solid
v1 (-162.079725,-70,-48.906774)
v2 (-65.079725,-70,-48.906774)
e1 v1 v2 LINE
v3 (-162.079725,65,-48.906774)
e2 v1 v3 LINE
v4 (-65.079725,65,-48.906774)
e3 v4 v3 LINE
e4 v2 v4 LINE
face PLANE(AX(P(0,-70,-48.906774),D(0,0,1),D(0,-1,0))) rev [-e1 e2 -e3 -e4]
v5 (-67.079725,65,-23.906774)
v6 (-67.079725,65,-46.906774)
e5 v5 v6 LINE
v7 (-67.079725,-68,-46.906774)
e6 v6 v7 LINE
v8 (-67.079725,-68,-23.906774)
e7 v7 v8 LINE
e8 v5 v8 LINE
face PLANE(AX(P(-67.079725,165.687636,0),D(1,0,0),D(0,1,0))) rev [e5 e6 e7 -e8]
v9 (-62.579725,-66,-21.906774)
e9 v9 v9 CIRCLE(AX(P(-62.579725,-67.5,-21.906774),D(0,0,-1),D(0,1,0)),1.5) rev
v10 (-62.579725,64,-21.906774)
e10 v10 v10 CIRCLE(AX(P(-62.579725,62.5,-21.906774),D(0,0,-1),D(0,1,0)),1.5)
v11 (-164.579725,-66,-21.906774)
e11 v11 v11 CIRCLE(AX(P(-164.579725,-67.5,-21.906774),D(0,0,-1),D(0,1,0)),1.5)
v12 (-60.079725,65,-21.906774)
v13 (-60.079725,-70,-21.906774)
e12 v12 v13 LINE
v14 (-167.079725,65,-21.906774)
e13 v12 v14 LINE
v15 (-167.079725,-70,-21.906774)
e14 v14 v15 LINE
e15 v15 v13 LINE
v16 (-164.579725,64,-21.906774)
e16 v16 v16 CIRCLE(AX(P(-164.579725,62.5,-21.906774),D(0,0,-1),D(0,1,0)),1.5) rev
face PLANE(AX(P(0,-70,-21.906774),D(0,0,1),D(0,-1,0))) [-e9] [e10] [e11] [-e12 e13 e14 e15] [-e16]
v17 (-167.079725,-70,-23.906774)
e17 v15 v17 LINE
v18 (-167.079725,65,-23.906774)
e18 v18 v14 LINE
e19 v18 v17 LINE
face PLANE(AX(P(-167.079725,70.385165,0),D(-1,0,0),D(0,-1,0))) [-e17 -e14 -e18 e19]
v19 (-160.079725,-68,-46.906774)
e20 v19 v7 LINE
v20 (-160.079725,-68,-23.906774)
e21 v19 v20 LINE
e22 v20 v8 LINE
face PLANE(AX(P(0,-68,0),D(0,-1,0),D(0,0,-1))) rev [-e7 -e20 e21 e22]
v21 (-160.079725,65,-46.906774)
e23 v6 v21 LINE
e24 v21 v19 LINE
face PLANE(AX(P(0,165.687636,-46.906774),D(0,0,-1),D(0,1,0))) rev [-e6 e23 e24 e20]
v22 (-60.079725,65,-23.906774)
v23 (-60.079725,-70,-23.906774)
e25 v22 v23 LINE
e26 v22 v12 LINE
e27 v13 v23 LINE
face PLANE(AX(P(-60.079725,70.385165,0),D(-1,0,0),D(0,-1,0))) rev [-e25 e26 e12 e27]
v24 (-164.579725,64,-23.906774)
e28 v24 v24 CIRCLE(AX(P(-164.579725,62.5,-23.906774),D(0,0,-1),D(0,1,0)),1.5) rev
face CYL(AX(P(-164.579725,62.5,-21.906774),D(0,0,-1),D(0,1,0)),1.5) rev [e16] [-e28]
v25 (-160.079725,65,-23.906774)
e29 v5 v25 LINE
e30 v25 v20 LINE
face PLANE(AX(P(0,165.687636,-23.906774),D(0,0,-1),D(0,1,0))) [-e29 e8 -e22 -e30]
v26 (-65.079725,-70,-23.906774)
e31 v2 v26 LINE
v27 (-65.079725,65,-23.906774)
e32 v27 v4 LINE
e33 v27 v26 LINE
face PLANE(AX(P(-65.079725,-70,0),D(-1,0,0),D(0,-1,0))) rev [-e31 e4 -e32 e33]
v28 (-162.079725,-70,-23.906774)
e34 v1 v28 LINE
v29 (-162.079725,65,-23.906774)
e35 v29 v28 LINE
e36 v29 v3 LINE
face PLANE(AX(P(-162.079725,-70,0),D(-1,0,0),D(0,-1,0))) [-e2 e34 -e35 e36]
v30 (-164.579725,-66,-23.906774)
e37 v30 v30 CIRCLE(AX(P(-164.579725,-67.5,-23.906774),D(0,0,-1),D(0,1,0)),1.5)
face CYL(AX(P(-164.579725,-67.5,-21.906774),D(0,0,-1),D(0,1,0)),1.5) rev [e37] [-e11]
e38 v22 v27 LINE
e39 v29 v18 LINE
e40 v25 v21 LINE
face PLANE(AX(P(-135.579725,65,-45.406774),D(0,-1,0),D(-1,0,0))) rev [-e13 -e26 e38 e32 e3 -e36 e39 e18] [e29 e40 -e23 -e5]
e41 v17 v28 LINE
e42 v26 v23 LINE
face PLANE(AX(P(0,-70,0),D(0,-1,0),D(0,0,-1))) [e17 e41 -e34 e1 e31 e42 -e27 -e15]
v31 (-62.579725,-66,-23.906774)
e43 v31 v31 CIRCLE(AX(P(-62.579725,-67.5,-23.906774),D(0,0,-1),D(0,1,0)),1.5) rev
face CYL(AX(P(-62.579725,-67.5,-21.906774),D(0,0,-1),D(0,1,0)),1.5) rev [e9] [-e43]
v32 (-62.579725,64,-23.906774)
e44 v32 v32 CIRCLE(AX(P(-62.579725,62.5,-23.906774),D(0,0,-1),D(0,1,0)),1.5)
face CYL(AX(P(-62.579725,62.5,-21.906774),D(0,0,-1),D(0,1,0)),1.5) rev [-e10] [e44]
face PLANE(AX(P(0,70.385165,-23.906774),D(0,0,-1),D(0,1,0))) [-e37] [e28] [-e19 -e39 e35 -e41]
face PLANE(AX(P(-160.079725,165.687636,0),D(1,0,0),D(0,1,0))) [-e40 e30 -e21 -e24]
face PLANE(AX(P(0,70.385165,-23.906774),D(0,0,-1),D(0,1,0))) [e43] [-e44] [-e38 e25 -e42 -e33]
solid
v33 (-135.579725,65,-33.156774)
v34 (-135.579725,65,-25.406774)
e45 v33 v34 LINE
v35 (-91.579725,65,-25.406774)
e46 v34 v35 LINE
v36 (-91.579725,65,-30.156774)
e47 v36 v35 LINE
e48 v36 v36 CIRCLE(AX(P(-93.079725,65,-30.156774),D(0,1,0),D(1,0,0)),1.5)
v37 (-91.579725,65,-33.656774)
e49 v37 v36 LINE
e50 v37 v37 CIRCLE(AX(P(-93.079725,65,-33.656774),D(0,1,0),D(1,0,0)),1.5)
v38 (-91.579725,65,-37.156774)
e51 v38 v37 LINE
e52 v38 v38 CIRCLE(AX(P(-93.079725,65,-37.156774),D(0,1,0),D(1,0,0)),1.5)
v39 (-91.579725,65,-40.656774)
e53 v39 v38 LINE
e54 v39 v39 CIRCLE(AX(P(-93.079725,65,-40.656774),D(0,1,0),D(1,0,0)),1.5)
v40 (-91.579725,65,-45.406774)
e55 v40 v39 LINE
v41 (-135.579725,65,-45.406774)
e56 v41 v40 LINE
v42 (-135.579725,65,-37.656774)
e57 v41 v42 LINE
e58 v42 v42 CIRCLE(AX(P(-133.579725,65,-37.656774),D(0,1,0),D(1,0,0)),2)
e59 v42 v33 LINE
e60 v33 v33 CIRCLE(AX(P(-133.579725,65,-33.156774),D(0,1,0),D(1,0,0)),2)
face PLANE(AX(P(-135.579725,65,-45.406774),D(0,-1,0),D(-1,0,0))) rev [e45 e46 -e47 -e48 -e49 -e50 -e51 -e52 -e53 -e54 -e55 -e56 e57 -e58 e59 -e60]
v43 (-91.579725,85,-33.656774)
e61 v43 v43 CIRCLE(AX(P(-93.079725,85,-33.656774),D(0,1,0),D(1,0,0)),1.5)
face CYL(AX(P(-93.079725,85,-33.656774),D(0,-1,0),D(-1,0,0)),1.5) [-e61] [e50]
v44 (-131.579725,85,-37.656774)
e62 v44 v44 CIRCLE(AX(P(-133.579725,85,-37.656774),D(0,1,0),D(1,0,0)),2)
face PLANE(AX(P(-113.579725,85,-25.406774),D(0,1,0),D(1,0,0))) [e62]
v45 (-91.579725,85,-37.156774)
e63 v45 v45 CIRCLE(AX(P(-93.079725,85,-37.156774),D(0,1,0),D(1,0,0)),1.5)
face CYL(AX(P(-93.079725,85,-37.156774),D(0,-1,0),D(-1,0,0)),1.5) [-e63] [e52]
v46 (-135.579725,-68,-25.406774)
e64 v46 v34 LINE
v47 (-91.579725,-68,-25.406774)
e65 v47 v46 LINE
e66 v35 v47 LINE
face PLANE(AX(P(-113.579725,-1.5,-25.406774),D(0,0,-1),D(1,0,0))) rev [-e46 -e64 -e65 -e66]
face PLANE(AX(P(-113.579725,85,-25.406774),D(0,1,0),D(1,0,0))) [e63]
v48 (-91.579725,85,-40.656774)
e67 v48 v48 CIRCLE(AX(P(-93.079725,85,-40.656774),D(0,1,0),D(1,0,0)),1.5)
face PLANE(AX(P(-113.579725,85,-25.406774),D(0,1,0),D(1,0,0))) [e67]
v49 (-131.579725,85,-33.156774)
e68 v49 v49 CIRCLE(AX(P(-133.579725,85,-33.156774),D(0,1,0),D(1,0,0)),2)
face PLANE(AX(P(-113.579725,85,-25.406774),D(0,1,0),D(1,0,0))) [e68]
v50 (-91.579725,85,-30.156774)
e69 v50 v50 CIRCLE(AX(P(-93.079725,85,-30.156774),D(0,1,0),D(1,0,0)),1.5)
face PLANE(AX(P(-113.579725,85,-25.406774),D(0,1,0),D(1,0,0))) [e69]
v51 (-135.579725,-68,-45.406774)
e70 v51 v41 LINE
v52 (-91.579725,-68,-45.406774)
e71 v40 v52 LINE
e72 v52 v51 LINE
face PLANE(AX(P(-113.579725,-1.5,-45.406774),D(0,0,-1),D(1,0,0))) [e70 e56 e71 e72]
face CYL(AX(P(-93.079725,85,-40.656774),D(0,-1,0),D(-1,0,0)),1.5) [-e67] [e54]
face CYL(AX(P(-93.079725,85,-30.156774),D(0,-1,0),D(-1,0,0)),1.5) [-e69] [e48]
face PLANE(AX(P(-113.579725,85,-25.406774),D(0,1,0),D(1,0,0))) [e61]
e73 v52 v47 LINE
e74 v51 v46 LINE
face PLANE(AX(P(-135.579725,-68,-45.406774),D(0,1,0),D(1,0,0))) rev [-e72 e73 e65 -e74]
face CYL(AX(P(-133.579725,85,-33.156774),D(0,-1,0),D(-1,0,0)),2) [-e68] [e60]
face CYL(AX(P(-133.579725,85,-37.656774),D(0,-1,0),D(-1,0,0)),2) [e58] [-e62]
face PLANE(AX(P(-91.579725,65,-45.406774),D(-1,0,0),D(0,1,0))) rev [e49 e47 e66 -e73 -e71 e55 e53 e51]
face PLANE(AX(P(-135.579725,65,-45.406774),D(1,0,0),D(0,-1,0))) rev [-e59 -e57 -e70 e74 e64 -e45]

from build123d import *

# Parameters (mm, degrees)
ZEE3200MAH_START         = -170.079725428
ZEE3200MAH_OUTLINE_W     = 20
ZEE3200MAH_OUTLINE_H     = 44
ZEE3200MAH_DEPTH         = 133
ZEE3200MAH_START_2       = -190.079725428
ZEE3200MAH_2_OUTLINE_R   = 1.5
ZEE3200MAH_2_OUTLINE_R_2 = 2
ZEE3200MAH_2_DEPTH       = 20
BODY_MOVE_COPY1_ANGLE    = 120
SKETCH2_W                = 97
SKETCH2_H                = 27
BOSS_EXTRUDE1_DEPTH      = 2
SKETCH2_3_W              = 2
SKETCH2_3_H              = 2
BOSS_EXTRUDE2_DEPTH      = 133
SKETCH4_W                = 5
SKETCH4_H                = 1
SKETCH4_H_2              = 2
BOSS_EXTRUDE4_DEPTH      = 135
SKETCH7_R                = 1.5
CUT_EXTRUDE2_DEPTH       = 190.118044219


# Read off the part's stored shape, not the designer's step: Zee3200mah
with BuildPart() as part:
    # Zee3200mah outline → Zee3200mah (new body)
    with BuildSketch(Plane.YZ.offset(ZEE3200MAH_START)):
        with Locations((10, -33.906773899)):
            Rectangle(ZEE3200MAH_OUTLINE_W, ZEE3200MAH_OUTLINE_H)
    extrude(amount=ZEE3200MAH_DEPTH)

    # Zee3200mah 2 outline → Zee3200mah 2 (add)
    with BuildSketch(Plane.YZ.offset(ZEE3200MAH_START_2)):
        with Locations((15.25, -13.406773899)):
            Circle(ZEE3200MAH_2_OUTLINE_R)
        with Locations((11.75, -13.406773899)):
            Circle(ZEE3200MAH_2_OUTLINE_R)
        with Locations((8.25, -13.406773899)):
            Circle(ZEE3200MAH_2_OUTLINE_R)
        with Locations((4.75, -13.406773899)):
            Circle(ZEE3200MAH_2_OUTLINE_R)
        with Locations((7.75, -53.906773899)):
            Circle(ZEE3200MAH_2_OUTLINE_R_2)
        with Locations((12.25, -53.906773899)):
            Circle(ZEE3200MAH_2_OUTLINE_R_2)
    extrude(amount=ZEE3200MAH_2_DEPTH)


with BuildPart() as part_1:
    # Body-Move/Copy1: moved
    add(part.part.moved(Location((0, 0, 0))).rotate(Axis((-61.584225652, -43.495499776, 18.088725876), (-0.5773502691896245, 0.5773502691896305, -0.5773502691896225)), BODY_MOVE_COPY1_ANGLE))


with BuildPart() as body_2:
    # Sketch2 → Boss-Extrude1 (new body)
    with BuildSketch(Plane.XZ.offset(68)):
        with Locations((-113.579725428, -35.406773899)):
            Rectangle(SKETCH2_W, SKETCH2_H)
    extrude(amount=BOSS_EXTRUDE1_DEPTH)

    # Sketch2<3> → Boss-Extrude2 (add)
    # profile 1 of 2: a face of its own
    with BuildSketch(Plane.XZ.offset(68)):
        Polygon((-65.079725428, -23.906773899), (-67.079725428, -23.906773899), (-67.079725428, -21.906773899), (-162.079725428, -21.906773899), (-162.079725428, -48.906773899), (-65.079725428, -48.906773899), align=None)
        Polygon((-160.079725428, -23.906773899), (-68.579725428, -23.906773899), (-67.079725428, -23.906773899), (-67.079725428, -25.406773899), (-67.079725428, -46.906773899), (-160.079725428, -46.906773899), align=None, mode=Mode.SUBTRACT)
    # profile 2 of 2: a face of its own
    with BuildSketch(Plane.XZ.offset(68)):
        with Locations((-66.079725428, -22.906773899)):
            Rectangle(SKETCH2_3_W, SKETCH2_3_H)
    extrude(amount=-BOSS_EXTRUDE2_DEPTH)

    # Sketch4 → Boss-Extrude4 (add)
    with BuildSketch(Plane.XZ.offset(70)):
        with Locations((-62.579725428, -23.406773899)):
            Rectangle(SKETCH4_W, SKETCH4_H)
        with Locations((-62.579725428, -22.406773899)):
            Rectangle(SKETCH4_W, SKETCH4_H)
        with Locations((-164.579725428, -22.906773899)):
            Rectangle(SKETCH4_W, SKETCH4_H_2)
    extrude(amount=-BOSS_EXTRUDE4_DEPTH)

    # Sketch7 → Cut-Extrude2 (cut, through all)
    with BuildSketch(Plane(origin=(0, 0, -23.906773899), x_dir=(-1, 0, 0), z_dir=(0, 0, -1))):
        with BuildLine():
            ThreePointArc((64.079725428, 62.5), (63.153750577, 63.885819299), (61.519065257, 63.560660172))
            Line((61.519065257, 63.560660172), (63.6403856, 61.439339828))
            ThreePointArc((63.6403856, 61.439339828), (63.965544727, 61.925974851), (64.079725428, 62.5))
        make_face()
        with BuildLine():
            Line((63.6403856, 61.439339828), (61.519065257, 63.560660172))
            ThreePointArc((61.519065257, 63.560660172), (61.519065257, 61.439339828), (63.6403856, 61.439339828))
        make_face()
        with Locations(Location((164.579725428, 62.5, 0), (0, 0, 90))):
            Circle(SKETCH7_R)
        with Locations(Location((62.579725428, -67.5, 0), (0, 0, 90))):
            Circle(SKETCH7_R)
        with Locations(Location((164.579725428, -67.5, 0), (0, 0, 90))):
            Circle(SKETCH7_R)
    extrude(amount=-CUT_EXTRUDE2_DEPTH, mode=Mode.SUBTRACT)


solid = Compound([part_1.part, body_2.part])
